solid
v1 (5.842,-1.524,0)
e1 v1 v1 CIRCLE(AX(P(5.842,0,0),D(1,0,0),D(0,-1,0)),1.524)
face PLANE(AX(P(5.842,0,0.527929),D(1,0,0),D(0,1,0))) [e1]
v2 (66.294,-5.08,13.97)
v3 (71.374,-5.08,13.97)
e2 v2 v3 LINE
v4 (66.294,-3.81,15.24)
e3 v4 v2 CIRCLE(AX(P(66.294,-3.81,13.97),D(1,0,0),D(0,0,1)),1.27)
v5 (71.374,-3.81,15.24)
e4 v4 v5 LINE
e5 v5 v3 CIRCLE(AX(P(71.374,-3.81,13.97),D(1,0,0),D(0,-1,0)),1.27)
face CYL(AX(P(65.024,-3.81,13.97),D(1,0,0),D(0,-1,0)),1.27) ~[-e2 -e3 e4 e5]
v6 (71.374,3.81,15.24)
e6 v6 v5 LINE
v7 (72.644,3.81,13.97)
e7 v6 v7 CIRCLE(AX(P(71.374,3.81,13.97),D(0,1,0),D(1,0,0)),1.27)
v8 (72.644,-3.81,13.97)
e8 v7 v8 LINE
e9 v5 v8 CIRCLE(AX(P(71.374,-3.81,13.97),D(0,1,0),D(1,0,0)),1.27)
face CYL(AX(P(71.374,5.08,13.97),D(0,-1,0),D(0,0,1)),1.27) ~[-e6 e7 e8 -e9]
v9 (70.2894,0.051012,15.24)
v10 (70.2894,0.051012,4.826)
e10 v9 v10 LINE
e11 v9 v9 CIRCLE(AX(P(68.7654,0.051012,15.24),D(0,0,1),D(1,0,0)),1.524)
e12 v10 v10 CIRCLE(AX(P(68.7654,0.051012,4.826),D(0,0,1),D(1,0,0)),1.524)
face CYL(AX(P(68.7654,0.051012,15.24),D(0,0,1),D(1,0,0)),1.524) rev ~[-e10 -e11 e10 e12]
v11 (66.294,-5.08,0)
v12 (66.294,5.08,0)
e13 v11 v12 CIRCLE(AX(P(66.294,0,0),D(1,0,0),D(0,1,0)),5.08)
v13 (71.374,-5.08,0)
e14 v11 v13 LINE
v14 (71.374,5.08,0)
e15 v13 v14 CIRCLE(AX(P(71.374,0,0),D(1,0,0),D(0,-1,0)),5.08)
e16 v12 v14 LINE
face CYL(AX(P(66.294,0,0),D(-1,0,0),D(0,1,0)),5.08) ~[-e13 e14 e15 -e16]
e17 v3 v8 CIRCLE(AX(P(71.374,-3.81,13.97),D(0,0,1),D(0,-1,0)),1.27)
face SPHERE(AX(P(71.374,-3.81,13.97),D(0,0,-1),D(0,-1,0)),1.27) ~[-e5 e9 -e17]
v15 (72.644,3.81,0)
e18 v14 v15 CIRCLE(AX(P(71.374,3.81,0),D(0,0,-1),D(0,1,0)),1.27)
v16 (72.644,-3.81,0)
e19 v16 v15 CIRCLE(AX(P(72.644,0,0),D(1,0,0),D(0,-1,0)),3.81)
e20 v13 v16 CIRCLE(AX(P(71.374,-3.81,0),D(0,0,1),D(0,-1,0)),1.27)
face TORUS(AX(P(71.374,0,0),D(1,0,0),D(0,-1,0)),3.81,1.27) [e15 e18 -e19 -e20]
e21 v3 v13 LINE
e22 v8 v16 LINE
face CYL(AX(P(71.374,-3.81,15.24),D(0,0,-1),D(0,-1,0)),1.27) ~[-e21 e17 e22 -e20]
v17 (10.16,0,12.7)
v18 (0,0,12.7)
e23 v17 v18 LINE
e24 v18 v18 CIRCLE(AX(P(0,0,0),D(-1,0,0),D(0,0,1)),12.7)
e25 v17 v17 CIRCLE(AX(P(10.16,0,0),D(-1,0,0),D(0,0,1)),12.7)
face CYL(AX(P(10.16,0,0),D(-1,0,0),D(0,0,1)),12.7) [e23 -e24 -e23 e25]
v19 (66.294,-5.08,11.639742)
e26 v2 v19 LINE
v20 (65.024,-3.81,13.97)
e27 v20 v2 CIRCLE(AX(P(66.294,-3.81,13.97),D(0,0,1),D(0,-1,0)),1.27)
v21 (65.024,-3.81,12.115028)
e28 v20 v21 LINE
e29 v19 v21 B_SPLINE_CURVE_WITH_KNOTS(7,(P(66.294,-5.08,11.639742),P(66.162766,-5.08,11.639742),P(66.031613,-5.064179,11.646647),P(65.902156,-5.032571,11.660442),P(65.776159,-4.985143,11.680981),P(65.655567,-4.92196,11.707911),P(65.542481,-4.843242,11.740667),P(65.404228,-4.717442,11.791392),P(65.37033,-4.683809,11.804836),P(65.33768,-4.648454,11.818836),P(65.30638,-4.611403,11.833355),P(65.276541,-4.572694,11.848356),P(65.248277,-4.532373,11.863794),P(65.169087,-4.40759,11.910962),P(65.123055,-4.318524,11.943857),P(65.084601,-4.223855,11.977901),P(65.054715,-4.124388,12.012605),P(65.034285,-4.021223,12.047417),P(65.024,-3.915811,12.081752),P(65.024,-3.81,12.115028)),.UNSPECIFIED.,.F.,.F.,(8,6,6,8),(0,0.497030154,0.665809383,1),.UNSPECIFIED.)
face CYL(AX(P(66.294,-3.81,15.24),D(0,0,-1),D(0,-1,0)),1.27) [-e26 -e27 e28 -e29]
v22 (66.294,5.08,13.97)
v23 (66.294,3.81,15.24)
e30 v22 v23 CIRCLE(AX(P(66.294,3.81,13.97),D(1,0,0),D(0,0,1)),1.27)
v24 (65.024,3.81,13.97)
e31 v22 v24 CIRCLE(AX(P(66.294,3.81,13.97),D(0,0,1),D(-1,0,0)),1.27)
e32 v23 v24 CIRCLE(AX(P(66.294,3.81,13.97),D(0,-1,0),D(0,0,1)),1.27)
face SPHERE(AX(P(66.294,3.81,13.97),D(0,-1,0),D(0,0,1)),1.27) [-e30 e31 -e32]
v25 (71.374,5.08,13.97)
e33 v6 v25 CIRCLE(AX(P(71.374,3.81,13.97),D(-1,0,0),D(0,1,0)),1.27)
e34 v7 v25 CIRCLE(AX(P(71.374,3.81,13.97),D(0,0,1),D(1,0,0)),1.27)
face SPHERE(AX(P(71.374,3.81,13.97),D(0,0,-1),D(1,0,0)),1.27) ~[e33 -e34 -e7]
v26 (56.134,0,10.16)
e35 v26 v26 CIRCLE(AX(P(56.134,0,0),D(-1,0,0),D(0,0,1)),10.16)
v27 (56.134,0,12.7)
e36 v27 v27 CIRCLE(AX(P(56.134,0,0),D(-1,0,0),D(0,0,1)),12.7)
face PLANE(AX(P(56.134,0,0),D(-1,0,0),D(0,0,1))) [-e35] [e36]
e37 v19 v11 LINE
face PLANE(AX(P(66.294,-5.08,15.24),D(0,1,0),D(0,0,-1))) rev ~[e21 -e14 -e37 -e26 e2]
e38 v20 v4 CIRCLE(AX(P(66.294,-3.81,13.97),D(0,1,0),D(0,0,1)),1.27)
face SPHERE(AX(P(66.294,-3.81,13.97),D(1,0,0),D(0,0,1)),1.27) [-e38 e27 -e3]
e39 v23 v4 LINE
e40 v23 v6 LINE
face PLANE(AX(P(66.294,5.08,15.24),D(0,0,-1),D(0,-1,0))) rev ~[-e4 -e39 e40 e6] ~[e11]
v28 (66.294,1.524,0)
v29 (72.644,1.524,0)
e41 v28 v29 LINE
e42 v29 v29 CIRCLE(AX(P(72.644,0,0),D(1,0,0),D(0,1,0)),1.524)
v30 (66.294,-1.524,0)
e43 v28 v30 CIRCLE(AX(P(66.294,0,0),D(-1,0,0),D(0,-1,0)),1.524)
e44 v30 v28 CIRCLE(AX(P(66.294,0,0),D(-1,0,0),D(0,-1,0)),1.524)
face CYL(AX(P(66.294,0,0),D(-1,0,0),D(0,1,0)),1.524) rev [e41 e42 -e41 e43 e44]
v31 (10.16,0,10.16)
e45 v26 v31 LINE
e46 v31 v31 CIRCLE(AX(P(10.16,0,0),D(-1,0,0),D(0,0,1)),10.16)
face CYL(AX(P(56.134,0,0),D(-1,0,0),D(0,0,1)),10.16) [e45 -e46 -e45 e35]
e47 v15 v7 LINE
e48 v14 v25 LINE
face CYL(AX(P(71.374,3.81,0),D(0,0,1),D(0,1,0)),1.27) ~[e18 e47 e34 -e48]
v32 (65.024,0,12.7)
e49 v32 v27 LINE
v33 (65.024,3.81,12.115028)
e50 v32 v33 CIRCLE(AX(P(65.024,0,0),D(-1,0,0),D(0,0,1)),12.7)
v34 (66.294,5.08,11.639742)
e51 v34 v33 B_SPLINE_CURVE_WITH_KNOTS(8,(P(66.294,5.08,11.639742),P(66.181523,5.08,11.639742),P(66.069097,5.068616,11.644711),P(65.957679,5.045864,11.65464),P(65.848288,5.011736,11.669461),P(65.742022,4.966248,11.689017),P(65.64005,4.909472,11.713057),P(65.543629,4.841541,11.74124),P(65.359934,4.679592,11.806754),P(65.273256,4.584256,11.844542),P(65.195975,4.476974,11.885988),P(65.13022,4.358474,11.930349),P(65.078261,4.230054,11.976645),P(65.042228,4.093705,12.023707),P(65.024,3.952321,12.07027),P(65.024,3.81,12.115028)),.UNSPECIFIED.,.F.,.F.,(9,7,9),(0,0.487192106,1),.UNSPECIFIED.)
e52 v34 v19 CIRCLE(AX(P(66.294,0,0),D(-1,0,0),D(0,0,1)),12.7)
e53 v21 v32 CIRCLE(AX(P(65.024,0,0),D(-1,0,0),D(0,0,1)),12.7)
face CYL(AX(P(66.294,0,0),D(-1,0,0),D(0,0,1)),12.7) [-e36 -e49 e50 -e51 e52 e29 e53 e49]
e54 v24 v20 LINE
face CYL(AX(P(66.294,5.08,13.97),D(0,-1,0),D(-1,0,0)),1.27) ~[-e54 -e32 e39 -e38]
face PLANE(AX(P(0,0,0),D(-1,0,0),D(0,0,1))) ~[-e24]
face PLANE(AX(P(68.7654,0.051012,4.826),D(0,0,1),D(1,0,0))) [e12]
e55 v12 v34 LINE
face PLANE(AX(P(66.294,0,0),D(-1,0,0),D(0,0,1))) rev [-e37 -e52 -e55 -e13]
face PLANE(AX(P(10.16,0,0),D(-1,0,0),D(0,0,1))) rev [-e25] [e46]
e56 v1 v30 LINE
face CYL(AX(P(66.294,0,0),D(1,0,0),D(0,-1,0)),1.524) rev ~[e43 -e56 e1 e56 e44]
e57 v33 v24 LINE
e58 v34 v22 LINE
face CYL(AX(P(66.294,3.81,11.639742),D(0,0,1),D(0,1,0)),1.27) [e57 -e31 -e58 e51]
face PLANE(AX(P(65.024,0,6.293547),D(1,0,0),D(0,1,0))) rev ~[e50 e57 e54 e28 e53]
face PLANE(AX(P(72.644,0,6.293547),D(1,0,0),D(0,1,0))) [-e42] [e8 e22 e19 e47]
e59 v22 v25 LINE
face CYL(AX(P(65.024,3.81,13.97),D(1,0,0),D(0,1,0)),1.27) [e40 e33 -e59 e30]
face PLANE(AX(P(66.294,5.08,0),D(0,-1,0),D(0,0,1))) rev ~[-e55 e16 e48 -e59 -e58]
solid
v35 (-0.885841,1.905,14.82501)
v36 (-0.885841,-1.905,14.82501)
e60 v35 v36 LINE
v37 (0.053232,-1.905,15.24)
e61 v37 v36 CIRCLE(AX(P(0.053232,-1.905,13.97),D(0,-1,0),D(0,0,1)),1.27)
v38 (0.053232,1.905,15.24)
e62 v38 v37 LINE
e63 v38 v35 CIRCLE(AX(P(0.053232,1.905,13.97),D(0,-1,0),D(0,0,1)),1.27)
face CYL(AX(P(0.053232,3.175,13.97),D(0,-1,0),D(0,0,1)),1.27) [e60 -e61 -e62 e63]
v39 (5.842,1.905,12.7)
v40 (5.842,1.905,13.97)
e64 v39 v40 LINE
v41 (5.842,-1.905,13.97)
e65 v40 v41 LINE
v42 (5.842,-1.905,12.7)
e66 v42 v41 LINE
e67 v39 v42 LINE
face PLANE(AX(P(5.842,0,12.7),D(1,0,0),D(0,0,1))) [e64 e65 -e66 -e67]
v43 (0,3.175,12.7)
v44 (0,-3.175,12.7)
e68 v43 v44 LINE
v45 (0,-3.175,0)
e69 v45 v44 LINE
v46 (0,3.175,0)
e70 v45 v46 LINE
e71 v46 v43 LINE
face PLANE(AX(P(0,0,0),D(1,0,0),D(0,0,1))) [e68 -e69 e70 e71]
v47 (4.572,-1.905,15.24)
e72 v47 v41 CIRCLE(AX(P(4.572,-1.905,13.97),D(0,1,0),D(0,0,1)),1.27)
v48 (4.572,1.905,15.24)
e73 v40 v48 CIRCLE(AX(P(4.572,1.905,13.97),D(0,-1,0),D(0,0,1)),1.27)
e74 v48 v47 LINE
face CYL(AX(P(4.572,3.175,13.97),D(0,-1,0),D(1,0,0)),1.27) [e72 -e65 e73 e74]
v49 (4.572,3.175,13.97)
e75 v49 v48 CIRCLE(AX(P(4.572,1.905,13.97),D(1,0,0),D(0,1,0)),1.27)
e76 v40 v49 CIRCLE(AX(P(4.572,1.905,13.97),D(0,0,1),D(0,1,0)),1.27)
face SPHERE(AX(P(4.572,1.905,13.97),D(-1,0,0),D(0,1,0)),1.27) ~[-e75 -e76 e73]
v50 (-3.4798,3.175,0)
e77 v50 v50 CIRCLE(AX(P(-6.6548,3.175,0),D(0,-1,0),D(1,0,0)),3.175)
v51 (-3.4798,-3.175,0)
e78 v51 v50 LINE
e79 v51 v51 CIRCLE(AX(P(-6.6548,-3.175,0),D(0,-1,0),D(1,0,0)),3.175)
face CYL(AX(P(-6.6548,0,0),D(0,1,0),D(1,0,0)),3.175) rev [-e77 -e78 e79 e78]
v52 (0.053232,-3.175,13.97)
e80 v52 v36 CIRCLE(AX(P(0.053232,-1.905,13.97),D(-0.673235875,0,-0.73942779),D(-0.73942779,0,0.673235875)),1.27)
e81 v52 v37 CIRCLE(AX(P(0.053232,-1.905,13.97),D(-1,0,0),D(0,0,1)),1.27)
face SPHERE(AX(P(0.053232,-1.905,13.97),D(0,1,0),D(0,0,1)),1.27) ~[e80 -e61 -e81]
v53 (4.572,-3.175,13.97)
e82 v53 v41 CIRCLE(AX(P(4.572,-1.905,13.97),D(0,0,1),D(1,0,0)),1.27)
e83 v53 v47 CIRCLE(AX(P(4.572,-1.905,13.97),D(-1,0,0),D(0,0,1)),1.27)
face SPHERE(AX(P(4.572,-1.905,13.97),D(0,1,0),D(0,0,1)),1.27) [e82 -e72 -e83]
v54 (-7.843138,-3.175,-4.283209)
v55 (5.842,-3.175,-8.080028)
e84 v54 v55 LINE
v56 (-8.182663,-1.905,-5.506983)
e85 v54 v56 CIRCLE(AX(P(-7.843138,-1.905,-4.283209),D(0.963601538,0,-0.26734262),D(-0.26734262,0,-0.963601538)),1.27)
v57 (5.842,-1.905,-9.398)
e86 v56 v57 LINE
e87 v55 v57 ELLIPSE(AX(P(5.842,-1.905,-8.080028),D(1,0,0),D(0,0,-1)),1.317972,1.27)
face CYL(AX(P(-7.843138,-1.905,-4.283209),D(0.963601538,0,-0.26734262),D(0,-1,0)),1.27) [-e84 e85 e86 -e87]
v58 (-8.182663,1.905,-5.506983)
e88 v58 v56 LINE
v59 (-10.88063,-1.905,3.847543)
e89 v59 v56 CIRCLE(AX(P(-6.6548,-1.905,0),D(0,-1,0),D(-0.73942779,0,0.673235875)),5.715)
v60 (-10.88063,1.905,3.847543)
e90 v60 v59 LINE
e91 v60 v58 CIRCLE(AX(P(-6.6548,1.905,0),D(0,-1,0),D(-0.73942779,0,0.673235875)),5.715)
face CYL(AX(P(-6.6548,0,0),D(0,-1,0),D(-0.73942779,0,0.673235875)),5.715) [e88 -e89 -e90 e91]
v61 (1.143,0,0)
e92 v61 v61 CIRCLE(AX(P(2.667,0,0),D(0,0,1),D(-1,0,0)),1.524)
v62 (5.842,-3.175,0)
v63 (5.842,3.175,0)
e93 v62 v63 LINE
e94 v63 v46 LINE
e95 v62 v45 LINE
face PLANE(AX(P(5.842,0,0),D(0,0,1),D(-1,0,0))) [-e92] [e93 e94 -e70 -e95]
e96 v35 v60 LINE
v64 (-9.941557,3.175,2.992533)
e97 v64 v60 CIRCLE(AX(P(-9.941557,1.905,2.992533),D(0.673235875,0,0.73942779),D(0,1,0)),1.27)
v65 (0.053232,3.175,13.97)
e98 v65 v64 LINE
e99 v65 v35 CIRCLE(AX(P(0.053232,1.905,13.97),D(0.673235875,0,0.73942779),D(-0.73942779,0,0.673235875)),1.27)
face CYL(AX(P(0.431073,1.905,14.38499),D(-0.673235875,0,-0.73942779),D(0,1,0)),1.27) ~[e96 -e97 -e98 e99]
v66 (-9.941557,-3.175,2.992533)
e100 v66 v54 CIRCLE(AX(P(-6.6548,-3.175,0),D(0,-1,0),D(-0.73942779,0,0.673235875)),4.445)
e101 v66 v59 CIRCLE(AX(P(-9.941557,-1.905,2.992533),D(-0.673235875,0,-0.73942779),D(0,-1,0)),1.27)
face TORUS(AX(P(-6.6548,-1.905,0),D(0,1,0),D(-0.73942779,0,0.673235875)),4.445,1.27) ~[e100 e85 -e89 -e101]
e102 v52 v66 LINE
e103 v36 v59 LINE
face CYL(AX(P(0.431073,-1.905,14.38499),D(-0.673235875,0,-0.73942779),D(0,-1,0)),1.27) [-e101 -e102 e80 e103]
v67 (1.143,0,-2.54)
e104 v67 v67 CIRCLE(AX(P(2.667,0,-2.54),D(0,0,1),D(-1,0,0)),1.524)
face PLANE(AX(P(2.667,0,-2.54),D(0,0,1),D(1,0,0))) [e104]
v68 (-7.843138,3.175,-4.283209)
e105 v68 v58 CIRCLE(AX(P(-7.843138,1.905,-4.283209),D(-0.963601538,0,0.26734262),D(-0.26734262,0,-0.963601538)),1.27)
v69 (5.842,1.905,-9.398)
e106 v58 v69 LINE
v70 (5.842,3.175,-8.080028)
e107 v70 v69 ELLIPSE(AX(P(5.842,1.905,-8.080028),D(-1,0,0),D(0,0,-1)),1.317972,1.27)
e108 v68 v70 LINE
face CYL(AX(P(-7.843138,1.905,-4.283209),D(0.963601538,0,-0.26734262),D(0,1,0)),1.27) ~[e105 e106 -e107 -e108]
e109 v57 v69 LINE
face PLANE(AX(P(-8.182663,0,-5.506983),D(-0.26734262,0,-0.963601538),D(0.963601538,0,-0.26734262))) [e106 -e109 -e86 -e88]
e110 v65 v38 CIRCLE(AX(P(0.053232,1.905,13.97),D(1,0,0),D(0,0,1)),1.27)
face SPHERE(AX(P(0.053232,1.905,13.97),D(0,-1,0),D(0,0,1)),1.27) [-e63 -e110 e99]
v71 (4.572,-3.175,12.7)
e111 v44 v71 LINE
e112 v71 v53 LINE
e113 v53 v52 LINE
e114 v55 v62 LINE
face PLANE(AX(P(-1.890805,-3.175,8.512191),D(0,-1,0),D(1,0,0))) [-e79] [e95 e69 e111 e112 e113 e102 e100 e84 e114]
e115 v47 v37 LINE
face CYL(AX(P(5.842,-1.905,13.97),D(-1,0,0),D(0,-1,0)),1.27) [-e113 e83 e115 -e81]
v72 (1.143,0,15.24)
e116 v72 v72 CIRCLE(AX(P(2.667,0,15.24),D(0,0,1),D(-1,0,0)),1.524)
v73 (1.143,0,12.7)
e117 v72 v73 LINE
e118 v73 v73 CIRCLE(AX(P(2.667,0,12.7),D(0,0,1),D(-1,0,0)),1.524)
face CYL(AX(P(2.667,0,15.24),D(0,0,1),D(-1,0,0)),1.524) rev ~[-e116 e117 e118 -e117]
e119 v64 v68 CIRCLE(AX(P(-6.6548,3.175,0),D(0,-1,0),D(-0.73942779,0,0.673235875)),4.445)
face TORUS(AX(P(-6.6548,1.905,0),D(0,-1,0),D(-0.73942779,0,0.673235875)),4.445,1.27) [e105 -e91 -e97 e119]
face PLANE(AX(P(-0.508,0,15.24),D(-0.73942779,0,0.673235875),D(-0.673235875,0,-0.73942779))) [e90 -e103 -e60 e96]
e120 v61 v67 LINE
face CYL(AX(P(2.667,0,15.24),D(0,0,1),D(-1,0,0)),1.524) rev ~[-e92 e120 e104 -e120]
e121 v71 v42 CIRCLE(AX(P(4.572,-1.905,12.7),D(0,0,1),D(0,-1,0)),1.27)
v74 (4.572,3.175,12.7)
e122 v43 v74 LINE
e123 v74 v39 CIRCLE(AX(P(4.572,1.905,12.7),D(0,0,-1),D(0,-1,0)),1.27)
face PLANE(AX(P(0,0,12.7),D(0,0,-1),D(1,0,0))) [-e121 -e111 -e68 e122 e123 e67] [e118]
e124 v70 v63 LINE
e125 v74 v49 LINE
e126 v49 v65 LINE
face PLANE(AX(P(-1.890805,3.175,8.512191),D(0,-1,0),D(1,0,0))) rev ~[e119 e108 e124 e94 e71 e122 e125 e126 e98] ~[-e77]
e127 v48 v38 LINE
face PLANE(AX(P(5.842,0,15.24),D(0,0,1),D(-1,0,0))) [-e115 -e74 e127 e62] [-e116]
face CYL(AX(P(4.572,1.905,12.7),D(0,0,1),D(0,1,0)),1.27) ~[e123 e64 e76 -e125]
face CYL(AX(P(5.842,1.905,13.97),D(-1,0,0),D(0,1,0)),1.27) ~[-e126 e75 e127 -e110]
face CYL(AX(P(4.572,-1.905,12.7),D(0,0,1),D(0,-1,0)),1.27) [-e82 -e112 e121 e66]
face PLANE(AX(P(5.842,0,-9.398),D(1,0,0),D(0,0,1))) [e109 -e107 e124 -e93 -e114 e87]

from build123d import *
from build123d import SkipClean  # not in build123d's __all__

# Parameters (mm, degrees)
F0_W      = 5.842
F0_H      = 12.7
F0_R      = 3.175
F2_DEPTH  = 3.175
F4_DEPTH  = 60.452
F5_R      = 1.524
F6_DEPTH  = 1.27
F7_DEPTH  = 6.35
F10_DEPTH = 17.78
F11_R     = 1.524
F12_DEPTH = 10.414
F13_R     = 1.27
F14_R     = 1.27


# Not quite as in the source:
# - after a boolean that leaves OpenCascade's solid faulty, fix() repairs it


with BuildPart() as f1:
    # F0 (on Front) → F1 (revolve)
    with BuildSketch(Plane.XZ):
        Polygon((5.842, 12.7), (5.842, 0), (66.294, 0), (66.294, 12.7), (56.134, 12.7), (56.134, 10.16), (10.16, 10.16), (10.16, 12.7), align=None)
        with Locations((2.921, 6.35)):
            Rectangle(F0_W, F0_H)
    revolve(axis=Axis((33.147, 0, 0), (-1, 0, 0)))

    # F3 (on face) → F4 (cut)
    with BuildSketch(Plane.YZ.offset(66.294)):
        with BuildLine():
            Line((-1.524, 0), (1.524, 0))
            ThreePointArc((1.524, 0), (0, 1.524), (-1.524, 0))
        make_face()
        with BuildLine():
            ThreePointArc((-1.524, 0), (0, -1.524), (1.524, 0))
            Line((1.524, 0), (-1.524, 0))
        make_face()
    extrude(amount=-F4_DEPTH, mode=Mode.SUBTRACT)

    # F5 (on face) → F6 (join)
    with BuildSketch(Plane.YZ.offset(66.294)):
        with BuildLine():
            ThreePointArc((-5.08, 0), (0, 5.08), (5.08, 0))
            Line((5.08, 0), (5.08, 11.6397422652))
            ThreePointArc((5.08, 11.6397422652), (0, 12.7), (-5.08, 11.6397422652))
            Line((-5.08, 11.6397422652), (-5.08, 0))
        make_face()
        with BuildLine():
            ThreePointArc((-5.08, 11.6397422652), (0, 12.7), (5.08, 11.6397422652))
            Line((5.08, 11.6397422652), (5.08, 15.24))
            Line((5.08, 15.24), (-5.08, 15.24))
            Line((-5.08, 15.24), (-5.08, 11.6397422652))
        make_face()
        with BuildLine():
            ThreePointArc((-5.08, 0), (0, -5.08), (5.08, 0))
            ThreePointArc((5.08, 0), (0, 5.08), (-5.08, 0))
        make_face()
        Circle(F5_R, mode=Mode.SUBTRACT)
    extrude(amount=-F6_DEPTH)

    # F5 (on face) → F7 (join)
    with BuildSketch(Plane.YZ.offset(66.294)):
        with BuildLine():
            ThreePointArc((-5.08, 0), (0, 5.08), (5.08, 0))
            Line((5.08, 0), (5.08, 11.6397422652))
            ThreePointArc((5.08, 11.6397422652), (0, 12.7), (-5.08, 11.6397422652))
            Line((-5.08, 11.6397422652), (-5.08, 0))
        make_face()
        with BuildLine():
            ThreePointArc((-5.08, 11.6397422652), (0, 12.7), (5.08, 11.6397422652))
            Line((5.08, 11.6397422652), (5.08, 15.24))
            Line((5.08, 15.24), (-5.08, 15.24))
            Line((-5.08, 15.24), (-5.08, 11.6397422652))
        make_face()
        with BuildLine():
            ThreePointArc((-5.08, 0), (0, -5.08), (5.08, 0))
            ThreePointArc((5.08, 0), (0, 5.08), (-5.08, 0))
        make_face()
        Circle(F5_R, mode=Mode.SUBTRACT)
    with SkipClean():  # cleaning this boolean's faces spoils the solid; the shape is the same uncleaned
        extrude(amount=F7_DEPTH)

    # F11 (on face) → F12 (cut)
    with BuildSketch(Plane.XY.offset(15.24)):
        with Locations((68.7653996064, 0.0510123878)):
            Circle(F11_R)
    extrude(amount=-F12_DEPTH, mode=Mode.SUBTRACT)

    add(f1.part.fix(), mode=Mode.REPLACE)

    # F13
    f13_edges = [f1.edges().sort_by_distance(p)[0] for p in [
        (72.644, -5.08, 7.62),
        (68.834, -5.08, 15.24),
        (72.644, 0, 15.24),
        (65.024, 0, 15.24),
        (68.834, 5.08, 15.24),
        (65.024, -5.08, 13.439871),
        (65.024, 5.08, 13.439871),
    ]]
    fillet(f13_edges, radius=F13_R)


with BuildPart() as f2:
    # F0 (on Front) → F2 (new body, symmetric)
    with BuildSketch(Plane.XZ):
        with BuildLine():
            Line((-0.9398, 0), (0, 0))
            Line((0, 0), (0, 12.7))
            Line((0, 12.7), (5.842, 12.7))
            Line((5.842, 12.7), (5.842, 15.24))
            Line((5.842, 15.24), (-0.508, 15.24))
            Line((-0.508, 15.24), (-10.8806298187, 3.8475430269))
            ThreePointArc((-10.8806298187, 3.8475430269), (-4.5919612295, 5.3297205562), (-0.9398, 0))
        make_face()
        with BuildLine():
            ThreePointArc((-8.1826630726, -5.5069827884), (-3.1957909266, -4.5493385486), (-0.9398, 0))
            ThreePointArc((-0.9398, 0), (-4.5919612295, 5.3297205562), (-10.8806298187, 3.8475430269))
            ThreePointArc((-10.8806298187, 3.8475430269), (-12.1459778134, -1.5837270034), (-8.1826630726, -5.5069827884))
        make_face()
        with Locations((-6.6548, 0)):
            Circle(F0_R, mode=Mode.SUBTRACT)
        with BuildLine():
            Line((5.842, 0), (0, 0))
            Line((0, 0), (-0.9398, 0))
            ThreePointArc((-0.9398, 0), (-3.1957909266, -4.5493385486), (-8.1826630726, -5.5069827884))
            Line((-8.1826630726, -5.5069827884), (5.842, -9.398))
            Line((5.842, -9.398), (5.842, 0))
        make_face()
    extrude(amount=F2_DEPTH, both=True)

    # F9 (on face) → F10 (cut)
    with BuildSketch(Plane.XY.offset(15.24)):
        with BuildLine():
            ThreePointArc((4.191, 0), (2.667, 1.524), (1.143, 0))
            ThreePointArc((1.143, 0), (2.667, -1.524), (4.191, 0))
        make_face()
    extrude(amount=-F10_DEPTH, mode=Mode.SUBTRACT)

    # F14
    f14_edges = [f2.edges().sort_by_distance(p)[0] for p in [
        (-5.694315, -3.175, 9.543772),
        (-5.694315, 3.175, 9.543772),
        (-0.508, 0, 15.24),
        (2.667, 3.175, 15.24),
        (5.842, 3.175, 13.97),
        (5.842, 0, 15.24),
        (2.667, -3.175, 15.24),
        (5.842, -3.175, 13.97),
        (-12.145978, 3.175, -1.583727),
        (-1.170332, 3.175, -7.452491),
        (-12.145978, -3.175, -1.583727),
        (-1.170332, -3.175, -7.452491),
    ]]
    fillet(f14_edges, radius=F14_R)


solid = Compound([f1.part, f2.part])
